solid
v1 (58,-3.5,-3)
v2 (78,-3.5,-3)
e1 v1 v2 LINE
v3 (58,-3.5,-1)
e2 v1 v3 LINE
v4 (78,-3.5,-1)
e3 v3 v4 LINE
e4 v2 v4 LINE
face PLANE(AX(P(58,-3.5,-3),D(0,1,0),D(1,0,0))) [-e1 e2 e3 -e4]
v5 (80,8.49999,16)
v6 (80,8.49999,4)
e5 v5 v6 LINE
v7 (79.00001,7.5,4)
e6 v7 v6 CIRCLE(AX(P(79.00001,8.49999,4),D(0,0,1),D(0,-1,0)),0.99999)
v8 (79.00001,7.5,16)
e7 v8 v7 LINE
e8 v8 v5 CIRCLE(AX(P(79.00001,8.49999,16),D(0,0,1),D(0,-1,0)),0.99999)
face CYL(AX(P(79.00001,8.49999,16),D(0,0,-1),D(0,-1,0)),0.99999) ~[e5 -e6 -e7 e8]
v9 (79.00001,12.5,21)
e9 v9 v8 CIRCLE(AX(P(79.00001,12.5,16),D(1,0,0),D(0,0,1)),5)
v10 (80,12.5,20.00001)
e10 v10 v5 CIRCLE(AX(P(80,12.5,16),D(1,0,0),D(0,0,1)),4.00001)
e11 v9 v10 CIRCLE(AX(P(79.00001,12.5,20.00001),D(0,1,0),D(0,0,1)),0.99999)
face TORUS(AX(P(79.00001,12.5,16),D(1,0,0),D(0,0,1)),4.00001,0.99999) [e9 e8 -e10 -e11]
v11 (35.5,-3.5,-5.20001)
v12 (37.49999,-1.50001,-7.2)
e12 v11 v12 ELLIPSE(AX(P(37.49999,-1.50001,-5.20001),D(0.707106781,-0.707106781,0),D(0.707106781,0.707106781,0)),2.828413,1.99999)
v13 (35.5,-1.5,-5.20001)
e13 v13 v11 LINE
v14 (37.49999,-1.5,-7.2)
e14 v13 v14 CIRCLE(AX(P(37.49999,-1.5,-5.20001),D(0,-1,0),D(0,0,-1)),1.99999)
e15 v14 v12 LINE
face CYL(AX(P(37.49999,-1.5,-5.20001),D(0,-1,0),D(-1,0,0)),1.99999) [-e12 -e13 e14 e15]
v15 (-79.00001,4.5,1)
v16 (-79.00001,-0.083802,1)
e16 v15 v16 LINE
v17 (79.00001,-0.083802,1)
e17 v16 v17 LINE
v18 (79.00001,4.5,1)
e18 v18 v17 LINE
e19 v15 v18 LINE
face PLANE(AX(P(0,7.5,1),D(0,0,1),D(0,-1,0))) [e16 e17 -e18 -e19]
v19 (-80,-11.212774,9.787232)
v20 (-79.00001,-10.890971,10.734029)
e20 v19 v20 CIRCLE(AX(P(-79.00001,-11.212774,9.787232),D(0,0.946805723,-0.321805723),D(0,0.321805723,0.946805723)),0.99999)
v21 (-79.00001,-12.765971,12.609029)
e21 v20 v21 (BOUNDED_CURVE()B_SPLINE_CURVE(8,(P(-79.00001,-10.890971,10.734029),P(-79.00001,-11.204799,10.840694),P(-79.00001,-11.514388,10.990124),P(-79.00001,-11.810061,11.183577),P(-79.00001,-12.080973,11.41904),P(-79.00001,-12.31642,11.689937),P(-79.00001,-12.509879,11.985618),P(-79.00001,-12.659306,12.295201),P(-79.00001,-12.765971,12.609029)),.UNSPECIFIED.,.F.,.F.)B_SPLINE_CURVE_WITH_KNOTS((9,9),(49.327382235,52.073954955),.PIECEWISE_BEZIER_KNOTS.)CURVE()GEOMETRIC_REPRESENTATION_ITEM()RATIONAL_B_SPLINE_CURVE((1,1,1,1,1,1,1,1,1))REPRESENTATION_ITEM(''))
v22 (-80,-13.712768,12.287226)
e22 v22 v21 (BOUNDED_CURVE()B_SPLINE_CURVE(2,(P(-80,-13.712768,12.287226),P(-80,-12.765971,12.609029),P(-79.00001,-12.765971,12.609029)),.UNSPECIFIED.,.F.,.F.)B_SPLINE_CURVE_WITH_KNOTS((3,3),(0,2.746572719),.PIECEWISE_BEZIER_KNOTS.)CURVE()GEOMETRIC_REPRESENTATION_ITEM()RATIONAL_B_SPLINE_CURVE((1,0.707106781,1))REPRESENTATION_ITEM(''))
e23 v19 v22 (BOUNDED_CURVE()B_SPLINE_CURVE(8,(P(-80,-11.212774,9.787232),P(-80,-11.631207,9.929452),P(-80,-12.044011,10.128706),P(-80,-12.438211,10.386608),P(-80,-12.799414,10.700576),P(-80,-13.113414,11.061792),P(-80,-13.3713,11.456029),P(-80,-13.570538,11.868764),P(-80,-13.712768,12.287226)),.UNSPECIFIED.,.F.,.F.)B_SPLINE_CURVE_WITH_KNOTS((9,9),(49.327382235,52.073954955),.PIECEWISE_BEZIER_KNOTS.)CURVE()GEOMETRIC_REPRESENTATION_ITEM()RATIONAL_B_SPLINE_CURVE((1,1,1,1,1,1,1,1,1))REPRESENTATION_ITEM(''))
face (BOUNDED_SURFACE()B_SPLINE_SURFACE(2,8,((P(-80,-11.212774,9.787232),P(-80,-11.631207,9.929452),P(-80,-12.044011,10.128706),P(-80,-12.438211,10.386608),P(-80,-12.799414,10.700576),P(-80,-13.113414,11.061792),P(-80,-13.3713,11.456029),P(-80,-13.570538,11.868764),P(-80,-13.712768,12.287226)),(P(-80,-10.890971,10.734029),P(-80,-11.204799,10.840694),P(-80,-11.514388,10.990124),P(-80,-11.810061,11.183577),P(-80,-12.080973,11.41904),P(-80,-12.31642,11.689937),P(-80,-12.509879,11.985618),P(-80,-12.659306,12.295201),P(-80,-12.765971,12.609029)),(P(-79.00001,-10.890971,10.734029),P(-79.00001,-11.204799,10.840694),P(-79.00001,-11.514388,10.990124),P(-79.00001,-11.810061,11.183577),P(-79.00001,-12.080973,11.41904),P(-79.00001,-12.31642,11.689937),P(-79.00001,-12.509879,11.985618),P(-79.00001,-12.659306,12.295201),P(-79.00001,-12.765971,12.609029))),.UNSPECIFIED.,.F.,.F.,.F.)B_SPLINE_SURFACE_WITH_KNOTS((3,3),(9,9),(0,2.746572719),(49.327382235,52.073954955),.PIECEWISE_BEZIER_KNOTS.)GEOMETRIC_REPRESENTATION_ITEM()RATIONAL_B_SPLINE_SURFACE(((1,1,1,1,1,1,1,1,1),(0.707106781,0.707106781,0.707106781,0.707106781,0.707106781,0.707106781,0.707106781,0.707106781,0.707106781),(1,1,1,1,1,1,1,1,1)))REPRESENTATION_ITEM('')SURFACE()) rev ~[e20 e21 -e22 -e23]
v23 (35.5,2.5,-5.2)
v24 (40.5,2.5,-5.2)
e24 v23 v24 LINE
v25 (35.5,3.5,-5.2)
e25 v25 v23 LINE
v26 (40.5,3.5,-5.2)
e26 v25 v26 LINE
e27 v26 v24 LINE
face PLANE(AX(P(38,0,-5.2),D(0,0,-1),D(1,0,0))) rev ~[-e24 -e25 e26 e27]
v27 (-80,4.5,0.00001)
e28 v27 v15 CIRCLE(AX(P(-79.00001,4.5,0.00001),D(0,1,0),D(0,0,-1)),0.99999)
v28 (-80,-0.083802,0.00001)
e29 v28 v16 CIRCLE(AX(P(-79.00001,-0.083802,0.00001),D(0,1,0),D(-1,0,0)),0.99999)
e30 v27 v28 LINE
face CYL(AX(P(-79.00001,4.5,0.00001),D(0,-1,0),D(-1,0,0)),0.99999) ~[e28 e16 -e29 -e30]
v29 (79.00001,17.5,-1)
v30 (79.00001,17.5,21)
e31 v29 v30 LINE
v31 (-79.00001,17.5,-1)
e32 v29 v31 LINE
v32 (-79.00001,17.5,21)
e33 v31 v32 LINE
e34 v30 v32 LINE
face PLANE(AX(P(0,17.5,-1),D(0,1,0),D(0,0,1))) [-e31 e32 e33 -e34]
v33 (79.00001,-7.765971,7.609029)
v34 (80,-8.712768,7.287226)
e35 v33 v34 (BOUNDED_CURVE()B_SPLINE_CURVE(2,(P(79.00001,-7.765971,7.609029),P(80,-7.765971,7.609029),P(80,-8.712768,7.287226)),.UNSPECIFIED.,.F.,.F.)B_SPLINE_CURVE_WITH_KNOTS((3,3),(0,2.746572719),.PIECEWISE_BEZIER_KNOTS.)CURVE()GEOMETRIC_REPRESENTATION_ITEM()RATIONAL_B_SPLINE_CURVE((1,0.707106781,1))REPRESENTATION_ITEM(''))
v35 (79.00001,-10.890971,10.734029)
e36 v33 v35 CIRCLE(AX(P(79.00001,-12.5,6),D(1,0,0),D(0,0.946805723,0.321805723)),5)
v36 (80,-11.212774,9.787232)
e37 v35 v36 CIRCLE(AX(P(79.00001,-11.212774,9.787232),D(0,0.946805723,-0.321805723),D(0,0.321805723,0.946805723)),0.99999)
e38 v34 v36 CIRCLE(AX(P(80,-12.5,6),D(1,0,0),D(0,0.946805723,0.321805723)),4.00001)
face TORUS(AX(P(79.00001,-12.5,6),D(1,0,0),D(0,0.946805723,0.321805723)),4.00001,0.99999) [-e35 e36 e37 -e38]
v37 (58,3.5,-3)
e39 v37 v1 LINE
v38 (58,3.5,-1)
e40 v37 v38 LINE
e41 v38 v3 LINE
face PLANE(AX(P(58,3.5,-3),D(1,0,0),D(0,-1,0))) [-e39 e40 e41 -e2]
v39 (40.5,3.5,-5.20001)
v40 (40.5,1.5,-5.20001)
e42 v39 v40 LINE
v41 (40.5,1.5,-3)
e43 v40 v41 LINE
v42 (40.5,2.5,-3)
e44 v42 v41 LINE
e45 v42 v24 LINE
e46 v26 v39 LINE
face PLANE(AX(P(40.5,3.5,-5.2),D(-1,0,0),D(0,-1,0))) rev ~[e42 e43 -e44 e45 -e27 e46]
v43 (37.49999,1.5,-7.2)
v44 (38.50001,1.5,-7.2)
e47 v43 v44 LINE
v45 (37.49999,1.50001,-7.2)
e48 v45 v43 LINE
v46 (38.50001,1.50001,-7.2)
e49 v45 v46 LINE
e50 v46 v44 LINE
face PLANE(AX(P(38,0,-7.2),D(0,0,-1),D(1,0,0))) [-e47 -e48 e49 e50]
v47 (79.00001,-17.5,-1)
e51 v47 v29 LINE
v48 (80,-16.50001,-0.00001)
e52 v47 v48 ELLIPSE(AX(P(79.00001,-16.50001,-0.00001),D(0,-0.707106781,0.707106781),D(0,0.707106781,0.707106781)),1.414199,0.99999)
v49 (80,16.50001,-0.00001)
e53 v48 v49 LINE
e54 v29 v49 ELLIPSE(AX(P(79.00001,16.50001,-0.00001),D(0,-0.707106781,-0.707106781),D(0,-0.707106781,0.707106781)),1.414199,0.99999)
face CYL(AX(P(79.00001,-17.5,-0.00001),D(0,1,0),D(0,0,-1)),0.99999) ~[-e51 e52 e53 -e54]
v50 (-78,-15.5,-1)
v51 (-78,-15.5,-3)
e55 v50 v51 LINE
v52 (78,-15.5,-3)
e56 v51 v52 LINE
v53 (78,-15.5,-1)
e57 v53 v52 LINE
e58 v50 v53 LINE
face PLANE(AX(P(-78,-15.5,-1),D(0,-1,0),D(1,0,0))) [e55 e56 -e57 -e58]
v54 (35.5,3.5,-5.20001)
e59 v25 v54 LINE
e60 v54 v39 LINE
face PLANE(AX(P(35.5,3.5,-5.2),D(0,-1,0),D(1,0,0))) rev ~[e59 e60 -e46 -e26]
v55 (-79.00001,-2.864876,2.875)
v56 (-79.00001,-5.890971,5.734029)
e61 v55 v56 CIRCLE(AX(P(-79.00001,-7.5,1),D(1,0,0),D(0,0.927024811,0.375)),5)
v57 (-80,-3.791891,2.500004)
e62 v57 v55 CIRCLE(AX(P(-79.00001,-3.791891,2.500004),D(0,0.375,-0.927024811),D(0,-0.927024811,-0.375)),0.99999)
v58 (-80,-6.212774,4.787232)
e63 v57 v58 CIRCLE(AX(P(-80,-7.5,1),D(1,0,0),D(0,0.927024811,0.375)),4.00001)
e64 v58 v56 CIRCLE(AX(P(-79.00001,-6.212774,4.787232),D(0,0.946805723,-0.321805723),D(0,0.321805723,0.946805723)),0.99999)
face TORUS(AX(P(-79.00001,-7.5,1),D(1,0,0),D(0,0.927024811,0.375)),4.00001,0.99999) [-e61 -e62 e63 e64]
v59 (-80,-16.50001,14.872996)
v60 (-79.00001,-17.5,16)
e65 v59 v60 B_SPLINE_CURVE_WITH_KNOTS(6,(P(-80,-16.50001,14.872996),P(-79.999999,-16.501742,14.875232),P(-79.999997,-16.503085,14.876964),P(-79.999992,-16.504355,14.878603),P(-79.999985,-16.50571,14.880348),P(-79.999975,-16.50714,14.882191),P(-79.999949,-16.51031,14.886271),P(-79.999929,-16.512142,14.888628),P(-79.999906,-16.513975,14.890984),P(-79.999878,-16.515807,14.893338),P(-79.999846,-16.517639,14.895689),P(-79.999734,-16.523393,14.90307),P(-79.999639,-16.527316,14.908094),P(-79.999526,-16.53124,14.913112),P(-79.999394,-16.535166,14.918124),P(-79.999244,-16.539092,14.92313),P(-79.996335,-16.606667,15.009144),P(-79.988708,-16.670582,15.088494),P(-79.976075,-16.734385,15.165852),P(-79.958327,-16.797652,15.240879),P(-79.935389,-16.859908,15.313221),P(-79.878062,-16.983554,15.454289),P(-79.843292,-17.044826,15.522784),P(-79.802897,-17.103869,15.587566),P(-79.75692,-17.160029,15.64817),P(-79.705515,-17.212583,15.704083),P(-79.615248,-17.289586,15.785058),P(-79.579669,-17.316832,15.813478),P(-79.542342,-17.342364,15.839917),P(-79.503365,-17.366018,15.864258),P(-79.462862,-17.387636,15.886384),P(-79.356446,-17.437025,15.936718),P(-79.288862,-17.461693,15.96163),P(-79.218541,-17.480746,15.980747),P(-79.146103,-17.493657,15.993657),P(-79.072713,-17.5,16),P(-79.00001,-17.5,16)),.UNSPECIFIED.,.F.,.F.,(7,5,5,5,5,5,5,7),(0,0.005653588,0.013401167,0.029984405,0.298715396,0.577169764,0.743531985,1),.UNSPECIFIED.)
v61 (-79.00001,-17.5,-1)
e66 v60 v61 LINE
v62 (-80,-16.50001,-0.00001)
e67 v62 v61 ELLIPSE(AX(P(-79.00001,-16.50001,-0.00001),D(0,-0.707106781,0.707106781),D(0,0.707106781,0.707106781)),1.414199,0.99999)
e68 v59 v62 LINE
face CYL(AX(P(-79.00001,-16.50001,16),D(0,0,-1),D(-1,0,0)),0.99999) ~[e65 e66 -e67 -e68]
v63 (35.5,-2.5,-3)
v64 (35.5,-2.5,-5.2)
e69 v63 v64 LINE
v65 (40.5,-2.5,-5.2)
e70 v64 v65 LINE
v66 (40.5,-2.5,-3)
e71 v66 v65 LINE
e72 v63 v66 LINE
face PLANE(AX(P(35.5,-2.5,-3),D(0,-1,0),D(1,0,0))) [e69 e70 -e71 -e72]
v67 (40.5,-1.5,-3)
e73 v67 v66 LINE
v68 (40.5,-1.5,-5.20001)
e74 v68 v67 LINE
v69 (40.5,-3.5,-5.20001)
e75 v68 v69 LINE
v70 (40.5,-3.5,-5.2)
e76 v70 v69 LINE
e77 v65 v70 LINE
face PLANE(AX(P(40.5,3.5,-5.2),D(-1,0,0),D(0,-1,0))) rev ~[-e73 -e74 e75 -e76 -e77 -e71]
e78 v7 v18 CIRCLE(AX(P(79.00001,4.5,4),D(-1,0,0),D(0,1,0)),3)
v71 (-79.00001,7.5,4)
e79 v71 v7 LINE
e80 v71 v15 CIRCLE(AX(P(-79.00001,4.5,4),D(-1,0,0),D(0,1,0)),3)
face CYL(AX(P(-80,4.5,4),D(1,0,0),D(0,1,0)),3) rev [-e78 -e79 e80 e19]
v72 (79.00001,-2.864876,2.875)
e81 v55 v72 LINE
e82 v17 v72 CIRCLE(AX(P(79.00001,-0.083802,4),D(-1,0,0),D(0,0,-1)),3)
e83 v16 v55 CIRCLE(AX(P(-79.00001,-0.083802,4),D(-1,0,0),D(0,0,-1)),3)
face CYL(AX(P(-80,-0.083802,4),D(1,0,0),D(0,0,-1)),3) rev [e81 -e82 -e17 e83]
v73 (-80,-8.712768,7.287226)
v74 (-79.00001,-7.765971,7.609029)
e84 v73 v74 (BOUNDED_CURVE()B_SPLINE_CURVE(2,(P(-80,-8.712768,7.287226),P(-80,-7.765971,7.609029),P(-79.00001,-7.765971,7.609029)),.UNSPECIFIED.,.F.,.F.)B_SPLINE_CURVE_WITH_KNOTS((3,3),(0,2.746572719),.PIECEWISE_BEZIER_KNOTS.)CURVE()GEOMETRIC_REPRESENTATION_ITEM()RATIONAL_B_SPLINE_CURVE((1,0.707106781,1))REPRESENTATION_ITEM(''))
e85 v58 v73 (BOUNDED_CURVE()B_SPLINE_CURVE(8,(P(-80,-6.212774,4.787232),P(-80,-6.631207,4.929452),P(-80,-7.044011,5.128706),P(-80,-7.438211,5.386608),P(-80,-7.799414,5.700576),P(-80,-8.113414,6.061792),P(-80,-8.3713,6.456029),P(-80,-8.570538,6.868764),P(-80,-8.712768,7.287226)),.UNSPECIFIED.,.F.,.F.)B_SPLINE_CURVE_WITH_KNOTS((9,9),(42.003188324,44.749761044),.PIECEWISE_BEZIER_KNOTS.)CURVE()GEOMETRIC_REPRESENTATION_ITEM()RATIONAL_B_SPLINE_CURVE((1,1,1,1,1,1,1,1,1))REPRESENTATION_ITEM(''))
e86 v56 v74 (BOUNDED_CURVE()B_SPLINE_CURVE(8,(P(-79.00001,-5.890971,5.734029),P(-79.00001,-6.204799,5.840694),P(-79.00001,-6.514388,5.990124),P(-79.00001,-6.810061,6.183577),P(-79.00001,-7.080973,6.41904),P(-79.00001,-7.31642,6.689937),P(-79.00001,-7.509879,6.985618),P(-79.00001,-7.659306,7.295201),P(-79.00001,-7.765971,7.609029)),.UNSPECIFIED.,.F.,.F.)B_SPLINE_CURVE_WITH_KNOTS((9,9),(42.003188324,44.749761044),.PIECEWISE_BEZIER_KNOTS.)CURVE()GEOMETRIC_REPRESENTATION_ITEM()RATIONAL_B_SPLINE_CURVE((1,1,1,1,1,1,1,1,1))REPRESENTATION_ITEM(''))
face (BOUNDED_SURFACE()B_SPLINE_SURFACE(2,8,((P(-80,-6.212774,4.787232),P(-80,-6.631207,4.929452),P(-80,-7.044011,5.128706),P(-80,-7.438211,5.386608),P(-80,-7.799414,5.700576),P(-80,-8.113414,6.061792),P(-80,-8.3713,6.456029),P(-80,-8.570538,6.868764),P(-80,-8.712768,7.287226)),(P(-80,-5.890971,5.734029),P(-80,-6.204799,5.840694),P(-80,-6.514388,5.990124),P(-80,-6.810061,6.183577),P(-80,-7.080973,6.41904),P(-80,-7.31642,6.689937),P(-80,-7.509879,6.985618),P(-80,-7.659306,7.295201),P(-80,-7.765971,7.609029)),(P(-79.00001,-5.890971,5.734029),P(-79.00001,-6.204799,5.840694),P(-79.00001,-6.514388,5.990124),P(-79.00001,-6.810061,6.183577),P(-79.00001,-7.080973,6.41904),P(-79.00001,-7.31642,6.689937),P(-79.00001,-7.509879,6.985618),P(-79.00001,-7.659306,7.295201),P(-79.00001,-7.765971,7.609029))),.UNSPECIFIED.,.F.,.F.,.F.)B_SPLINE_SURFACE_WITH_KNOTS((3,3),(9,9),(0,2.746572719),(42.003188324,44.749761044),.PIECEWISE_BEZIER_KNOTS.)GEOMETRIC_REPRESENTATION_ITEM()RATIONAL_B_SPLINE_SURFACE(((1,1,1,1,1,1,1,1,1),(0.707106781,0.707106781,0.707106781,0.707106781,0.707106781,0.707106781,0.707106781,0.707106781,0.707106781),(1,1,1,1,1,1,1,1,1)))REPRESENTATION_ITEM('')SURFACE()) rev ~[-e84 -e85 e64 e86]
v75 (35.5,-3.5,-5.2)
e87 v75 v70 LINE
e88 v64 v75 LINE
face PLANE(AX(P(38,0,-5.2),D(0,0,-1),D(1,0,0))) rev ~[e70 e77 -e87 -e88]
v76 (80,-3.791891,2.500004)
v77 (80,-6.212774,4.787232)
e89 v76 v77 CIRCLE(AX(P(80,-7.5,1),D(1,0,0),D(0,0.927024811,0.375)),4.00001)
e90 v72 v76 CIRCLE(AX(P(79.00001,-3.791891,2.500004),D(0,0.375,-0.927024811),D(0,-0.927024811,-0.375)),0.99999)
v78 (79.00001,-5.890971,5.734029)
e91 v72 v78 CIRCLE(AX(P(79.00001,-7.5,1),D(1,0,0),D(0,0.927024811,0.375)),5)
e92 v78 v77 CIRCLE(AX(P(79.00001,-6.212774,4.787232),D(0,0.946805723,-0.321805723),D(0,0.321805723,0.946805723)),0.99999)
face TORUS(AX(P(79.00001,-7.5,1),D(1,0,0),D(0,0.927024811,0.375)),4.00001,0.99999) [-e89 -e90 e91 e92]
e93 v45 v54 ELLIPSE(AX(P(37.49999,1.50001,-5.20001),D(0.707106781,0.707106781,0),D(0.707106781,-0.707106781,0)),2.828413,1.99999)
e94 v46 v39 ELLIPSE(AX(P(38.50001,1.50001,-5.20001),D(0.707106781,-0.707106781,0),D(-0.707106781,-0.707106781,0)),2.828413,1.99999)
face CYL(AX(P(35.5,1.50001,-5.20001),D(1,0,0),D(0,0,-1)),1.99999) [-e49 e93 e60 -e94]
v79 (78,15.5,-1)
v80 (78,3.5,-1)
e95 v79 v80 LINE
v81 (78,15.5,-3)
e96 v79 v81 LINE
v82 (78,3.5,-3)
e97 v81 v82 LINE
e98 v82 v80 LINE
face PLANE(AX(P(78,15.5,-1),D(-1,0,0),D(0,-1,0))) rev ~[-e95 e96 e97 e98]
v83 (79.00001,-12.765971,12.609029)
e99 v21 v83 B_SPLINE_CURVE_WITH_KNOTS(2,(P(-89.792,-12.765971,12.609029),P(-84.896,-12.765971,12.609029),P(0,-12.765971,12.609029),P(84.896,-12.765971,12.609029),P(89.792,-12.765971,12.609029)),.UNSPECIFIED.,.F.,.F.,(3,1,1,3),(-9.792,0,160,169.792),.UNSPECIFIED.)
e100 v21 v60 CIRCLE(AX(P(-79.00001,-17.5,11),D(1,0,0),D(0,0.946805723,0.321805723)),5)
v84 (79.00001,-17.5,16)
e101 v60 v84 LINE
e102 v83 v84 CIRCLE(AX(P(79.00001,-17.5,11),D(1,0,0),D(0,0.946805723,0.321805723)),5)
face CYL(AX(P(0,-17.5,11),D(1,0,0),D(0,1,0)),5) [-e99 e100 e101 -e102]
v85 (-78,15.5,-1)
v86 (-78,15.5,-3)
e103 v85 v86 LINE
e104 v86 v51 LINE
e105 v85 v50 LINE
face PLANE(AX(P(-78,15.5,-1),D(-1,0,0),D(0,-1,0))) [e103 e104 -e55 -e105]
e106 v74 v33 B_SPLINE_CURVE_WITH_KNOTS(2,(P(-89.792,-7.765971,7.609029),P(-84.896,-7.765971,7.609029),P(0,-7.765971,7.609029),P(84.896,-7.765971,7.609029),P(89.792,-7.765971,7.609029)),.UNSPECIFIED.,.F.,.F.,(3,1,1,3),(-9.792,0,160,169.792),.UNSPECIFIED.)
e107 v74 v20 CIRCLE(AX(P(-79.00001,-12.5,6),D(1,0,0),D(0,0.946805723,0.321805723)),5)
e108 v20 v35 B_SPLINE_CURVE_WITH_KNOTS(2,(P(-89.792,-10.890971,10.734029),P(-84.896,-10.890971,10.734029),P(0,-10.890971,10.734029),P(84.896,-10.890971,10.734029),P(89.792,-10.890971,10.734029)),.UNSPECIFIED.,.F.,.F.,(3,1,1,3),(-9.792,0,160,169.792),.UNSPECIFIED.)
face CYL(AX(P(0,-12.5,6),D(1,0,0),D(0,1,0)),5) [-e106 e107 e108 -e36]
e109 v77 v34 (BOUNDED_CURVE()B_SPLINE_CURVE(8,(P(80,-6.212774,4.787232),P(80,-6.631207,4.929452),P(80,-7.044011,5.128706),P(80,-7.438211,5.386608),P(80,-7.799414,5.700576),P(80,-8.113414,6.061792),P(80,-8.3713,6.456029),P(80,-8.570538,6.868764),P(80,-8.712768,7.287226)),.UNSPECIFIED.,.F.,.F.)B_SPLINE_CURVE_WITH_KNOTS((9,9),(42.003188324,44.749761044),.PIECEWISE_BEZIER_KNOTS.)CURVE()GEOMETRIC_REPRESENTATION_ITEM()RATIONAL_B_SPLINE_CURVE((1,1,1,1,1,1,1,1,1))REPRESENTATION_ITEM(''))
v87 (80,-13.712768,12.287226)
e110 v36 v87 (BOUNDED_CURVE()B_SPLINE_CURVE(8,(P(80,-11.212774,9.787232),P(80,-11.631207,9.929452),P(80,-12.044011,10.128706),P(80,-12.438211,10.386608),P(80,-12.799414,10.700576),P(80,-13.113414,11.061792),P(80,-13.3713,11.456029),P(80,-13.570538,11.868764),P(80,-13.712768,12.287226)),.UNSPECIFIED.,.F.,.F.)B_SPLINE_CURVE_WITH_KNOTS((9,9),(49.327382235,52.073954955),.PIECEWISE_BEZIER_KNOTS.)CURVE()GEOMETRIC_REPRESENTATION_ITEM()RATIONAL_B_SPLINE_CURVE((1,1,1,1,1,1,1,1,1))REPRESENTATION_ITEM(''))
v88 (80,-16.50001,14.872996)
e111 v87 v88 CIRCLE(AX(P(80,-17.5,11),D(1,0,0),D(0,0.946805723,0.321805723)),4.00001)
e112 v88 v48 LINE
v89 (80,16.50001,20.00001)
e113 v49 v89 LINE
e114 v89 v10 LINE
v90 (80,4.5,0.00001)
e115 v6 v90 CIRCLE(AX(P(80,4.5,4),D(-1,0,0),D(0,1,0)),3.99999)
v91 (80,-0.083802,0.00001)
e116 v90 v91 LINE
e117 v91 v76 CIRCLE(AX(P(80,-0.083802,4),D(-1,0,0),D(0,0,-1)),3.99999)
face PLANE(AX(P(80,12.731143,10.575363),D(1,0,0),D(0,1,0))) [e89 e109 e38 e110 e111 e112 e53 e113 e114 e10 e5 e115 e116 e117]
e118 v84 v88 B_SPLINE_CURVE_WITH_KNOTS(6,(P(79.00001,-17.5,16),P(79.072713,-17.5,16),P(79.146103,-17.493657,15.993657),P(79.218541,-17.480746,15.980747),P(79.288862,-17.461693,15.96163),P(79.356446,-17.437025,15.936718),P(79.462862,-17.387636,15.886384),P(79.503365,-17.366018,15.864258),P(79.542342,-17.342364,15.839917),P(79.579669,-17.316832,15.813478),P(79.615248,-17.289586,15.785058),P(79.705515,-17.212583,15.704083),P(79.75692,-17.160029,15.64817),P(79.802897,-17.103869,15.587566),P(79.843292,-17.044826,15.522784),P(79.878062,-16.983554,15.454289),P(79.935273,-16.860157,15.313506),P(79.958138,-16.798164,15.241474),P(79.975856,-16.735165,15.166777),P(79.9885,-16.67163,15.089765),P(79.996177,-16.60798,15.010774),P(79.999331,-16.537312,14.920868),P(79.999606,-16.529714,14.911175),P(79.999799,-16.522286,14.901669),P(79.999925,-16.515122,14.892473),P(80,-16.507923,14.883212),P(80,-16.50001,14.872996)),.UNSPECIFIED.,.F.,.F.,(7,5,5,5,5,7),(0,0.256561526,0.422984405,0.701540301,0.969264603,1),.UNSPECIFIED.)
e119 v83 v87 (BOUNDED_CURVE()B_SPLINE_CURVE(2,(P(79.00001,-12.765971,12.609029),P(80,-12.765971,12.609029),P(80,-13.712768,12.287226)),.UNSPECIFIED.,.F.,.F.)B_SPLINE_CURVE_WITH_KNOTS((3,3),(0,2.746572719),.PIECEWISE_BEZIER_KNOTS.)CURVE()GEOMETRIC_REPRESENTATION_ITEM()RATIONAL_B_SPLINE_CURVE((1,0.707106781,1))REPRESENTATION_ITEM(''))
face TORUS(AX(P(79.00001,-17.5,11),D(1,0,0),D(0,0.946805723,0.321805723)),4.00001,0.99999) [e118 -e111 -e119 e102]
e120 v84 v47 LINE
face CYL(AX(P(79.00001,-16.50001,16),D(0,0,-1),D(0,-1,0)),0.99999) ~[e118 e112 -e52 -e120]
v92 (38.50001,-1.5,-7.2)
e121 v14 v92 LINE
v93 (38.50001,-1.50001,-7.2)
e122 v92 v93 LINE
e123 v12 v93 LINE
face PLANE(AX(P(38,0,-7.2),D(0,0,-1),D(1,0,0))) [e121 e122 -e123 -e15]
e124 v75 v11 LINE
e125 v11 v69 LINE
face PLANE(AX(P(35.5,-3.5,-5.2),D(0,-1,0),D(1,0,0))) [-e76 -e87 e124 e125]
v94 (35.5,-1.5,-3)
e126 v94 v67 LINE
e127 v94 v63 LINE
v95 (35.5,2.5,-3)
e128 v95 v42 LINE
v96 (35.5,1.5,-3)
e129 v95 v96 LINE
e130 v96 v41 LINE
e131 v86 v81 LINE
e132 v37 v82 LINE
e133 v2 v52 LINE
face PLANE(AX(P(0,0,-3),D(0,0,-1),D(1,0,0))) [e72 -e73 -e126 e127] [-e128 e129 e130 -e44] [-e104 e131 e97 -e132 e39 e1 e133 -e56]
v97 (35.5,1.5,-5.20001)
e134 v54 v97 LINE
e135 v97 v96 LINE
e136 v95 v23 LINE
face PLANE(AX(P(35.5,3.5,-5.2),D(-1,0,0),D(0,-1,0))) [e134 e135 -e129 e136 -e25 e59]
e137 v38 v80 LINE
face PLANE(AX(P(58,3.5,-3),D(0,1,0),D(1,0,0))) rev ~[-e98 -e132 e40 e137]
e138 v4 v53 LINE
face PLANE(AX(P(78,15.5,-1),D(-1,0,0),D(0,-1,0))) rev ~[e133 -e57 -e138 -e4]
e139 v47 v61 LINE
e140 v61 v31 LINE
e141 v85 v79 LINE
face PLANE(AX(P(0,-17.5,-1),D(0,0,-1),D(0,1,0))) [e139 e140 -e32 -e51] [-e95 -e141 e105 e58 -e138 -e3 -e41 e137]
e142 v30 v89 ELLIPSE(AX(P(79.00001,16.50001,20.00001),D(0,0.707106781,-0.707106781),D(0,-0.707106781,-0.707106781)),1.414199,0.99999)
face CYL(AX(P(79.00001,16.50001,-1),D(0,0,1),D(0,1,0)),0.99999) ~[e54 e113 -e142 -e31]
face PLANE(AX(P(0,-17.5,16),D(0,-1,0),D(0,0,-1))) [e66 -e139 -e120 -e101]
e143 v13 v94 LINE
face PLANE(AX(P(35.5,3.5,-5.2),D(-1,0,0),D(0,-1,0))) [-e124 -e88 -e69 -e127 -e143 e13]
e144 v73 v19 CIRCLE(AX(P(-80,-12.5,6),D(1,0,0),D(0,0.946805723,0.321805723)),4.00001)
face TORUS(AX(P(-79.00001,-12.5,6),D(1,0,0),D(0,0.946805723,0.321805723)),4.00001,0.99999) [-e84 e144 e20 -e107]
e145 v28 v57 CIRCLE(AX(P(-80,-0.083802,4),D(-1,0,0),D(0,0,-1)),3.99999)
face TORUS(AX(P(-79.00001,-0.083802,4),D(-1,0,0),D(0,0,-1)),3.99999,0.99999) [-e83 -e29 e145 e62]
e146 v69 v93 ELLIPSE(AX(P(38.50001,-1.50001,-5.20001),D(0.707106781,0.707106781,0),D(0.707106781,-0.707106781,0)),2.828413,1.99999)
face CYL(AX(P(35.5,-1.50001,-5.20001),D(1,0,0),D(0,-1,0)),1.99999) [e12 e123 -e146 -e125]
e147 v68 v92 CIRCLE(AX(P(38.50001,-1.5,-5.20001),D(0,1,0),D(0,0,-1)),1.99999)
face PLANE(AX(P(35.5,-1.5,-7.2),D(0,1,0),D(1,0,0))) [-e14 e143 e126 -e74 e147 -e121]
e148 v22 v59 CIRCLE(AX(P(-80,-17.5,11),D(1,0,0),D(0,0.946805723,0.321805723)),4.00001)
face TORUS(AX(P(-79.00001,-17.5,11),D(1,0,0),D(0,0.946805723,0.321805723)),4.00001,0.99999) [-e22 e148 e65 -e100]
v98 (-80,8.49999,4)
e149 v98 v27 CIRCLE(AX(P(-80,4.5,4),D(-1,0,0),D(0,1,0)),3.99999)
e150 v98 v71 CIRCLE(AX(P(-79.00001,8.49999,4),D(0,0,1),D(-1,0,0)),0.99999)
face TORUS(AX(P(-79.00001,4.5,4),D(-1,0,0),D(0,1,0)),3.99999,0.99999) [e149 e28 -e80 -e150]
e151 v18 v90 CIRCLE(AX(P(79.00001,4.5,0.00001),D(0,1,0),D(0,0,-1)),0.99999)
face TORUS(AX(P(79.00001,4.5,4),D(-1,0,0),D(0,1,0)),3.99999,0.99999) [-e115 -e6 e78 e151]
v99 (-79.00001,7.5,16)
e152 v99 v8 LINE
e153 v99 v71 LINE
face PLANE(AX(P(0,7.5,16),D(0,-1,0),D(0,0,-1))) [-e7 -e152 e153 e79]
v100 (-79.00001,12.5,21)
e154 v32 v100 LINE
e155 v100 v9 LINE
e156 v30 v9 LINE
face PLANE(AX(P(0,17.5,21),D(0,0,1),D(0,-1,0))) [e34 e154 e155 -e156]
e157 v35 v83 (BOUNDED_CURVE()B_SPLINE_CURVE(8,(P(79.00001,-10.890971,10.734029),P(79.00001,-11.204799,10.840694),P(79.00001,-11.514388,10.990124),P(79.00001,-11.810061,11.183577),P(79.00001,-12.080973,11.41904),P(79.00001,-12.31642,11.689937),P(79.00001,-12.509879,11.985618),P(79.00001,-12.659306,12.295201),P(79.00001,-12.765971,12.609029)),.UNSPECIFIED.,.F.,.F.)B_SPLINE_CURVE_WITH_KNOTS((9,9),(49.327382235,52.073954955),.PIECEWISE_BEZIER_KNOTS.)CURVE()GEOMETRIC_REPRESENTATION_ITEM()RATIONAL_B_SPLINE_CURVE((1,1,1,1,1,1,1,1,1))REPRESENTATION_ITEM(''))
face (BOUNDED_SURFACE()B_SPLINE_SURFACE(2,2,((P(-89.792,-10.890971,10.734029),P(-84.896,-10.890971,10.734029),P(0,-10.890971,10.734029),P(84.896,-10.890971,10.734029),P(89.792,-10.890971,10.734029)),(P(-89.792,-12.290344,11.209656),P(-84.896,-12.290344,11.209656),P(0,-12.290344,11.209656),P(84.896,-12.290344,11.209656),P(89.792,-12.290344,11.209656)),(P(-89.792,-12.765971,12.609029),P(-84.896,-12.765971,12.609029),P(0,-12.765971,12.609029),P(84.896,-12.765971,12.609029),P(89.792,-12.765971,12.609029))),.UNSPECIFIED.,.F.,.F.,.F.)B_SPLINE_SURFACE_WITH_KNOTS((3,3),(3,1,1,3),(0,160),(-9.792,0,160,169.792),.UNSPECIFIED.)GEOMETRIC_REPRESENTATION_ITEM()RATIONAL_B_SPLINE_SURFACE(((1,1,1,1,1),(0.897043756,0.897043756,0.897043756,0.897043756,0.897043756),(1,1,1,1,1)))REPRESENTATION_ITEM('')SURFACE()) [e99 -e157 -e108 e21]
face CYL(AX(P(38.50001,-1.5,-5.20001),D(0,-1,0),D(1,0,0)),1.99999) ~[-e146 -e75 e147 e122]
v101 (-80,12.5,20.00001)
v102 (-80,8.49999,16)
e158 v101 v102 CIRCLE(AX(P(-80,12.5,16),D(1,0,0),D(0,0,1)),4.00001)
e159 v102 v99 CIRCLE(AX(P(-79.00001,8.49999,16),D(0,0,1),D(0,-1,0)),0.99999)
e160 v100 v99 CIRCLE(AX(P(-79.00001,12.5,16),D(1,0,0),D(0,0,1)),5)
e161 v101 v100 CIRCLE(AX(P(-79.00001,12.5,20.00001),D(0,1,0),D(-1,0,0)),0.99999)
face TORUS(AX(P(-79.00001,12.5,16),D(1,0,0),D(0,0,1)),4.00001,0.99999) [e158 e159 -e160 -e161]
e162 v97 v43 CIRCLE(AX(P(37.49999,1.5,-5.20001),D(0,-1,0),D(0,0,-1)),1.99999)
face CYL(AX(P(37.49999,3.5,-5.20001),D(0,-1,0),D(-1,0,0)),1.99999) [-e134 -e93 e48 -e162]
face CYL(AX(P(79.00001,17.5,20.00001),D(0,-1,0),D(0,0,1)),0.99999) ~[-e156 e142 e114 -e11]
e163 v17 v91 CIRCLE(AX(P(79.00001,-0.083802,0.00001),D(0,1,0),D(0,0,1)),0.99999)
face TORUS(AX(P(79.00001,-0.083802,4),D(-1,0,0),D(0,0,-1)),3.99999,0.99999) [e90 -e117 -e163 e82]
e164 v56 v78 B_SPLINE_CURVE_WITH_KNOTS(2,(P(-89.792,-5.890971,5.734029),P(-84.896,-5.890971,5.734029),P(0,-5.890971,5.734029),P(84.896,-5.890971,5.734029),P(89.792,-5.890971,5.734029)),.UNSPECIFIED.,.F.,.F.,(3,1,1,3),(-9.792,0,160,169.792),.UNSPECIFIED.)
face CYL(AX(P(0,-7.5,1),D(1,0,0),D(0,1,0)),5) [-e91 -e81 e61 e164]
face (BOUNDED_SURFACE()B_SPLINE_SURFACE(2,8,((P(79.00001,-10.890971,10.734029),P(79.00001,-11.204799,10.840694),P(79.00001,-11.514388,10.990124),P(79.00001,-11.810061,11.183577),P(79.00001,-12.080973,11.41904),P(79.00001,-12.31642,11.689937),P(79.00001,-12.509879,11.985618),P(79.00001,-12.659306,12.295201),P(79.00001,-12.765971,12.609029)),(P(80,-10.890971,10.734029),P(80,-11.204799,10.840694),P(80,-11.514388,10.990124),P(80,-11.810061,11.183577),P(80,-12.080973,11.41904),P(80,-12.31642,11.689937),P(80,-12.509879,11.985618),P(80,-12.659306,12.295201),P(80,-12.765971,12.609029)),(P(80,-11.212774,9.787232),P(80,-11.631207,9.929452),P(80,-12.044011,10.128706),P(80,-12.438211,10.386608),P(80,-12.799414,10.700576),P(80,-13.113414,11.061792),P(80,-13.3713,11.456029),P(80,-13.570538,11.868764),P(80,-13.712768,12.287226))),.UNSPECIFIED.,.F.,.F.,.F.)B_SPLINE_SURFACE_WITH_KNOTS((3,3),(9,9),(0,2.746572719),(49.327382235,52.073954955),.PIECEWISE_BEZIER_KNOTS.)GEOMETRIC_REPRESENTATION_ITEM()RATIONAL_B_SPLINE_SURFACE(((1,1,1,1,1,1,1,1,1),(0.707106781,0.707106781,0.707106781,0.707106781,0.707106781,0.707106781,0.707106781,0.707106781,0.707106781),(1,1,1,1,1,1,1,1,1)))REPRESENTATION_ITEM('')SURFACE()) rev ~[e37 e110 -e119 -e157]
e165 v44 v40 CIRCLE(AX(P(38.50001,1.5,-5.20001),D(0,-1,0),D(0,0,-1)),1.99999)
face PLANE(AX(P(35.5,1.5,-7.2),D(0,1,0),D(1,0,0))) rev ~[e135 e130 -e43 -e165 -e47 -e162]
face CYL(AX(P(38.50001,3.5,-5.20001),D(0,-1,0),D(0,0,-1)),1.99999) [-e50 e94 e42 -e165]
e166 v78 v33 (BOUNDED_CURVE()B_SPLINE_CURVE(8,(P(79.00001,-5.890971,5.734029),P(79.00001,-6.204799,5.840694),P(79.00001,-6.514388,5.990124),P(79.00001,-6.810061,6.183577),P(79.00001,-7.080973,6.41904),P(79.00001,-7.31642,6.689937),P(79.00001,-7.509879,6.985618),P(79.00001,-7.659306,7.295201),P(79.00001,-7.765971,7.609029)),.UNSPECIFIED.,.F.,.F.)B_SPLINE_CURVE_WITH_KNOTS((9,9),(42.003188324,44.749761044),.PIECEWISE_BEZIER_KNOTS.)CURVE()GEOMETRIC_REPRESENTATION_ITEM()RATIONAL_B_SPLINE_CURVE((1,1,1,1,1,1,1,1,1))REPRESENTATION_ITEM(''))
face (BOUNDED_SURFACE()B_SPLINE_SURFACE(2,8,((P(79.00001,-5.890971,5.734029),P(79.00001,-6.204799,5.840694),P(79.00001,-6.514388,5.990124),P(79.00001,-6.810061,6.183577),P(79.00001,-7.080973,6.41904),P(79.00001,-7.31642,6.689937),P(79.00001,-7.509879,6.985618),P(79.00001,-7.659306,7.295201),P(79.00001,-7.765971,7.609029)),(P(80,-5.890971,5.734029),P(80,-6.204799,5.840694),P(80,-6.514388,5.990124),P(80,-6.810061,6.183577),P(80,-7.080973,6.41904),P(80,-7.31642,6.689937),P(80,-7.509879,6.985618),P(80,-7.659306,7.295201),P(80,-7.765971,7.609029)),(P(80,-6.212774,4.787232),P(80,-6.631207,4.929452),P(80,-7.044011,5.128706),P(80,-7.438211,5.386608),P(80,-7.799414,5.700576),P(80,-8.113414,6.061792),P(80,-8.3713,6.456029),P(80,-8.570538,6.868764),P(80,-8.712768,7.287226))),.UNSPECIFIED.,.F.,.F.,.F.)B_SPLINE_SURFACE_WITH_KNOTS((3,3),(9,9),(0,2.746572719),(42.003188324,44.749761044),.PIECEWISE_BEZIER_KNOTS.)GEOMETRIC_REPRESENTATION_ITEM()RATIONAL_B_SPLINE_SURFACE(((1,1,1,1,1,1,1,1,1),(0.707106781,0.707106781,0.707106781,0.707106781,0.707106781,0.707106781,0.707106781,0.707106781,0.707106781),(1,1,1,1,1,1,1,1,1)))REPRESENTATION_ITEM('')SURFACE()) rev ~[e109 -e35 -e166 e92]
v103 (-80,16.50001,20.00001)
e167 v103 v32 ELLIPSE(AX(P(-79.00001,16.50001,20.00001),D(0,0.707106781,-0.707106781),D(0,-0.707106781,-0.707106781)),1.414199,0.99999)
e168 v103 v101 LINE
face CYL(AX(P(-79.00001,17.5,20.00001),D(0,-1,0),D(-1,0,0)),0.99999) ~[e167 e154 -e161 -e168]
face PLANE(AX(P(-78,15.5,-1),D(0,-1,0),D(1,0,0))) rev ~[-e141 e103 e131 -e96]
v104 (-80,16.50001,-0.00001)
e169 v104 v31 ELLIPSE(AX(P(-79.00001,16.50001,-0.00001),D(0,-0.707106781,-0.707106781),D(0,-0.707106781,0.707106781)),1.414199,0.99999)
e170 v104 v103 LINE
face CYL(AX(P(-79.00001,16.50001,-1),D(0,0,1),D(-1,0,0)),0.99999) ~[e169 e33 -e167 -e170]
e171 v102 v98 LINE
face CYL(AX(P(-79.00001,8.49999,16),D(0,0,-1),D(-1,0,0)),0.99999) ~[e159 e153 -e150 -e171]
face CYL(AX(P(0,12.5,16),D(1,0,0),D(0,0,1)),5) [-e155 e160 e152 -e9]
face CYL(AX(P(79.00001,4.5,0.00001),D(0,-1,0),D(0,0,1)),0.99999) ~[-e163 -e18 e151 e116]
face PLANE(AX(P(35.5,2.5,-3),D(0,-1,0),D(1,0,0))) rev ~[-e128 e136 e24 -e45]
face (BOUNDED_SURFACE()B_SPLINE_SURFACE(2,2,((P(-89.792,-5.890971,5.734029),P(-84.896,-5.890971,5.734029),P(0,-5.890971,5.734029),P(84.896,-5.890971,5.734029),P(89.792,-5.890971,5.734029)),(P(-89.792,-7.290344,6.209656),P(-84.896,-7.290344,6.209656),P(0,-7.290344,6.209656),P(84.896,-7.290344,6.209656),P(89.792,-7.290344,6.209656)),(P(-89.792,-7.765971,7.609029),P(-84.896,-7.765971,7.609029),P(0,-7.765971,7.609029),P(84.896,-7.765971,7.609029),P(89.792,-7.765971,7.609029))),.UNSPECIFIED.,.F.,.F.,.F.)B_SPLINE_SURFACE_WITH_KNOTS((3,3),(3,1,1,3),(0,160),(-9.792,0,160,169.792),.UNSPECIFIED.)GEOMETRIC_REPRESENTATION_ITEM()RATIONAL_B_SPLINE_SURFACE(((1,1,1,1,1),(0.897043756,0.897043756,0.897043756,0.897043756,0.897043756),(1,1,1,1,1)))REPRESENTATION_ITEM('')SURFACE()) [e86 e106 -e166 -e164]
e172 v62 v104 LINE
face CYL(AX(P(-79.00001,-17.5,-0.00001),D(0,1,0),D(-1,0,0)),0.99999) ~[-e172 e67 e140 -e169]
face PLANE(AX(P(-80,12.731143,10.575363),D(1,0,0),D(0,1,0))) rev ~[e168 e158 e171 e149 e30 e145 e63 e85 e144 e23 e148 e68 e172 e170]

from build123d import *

# Parameters (mm, degrees)
F1_DEPTH  = 80
F2_W      = 156
F2_H      = 31
F3_DEPTH  = 2
F4_W      = 5
F4_H      = 5
F5_DEPTH  = 2.2
F6_W      = 5
F6_H      = 7
F7_DEPTH  = 2
F8_W      = 5
F8_H      = 3
F9_DEPTH  = 4.2
F10_R     = 1.99999
F11_W     = 20
F11_H     = 7
F12_DEPTH = 2
F13_R     = 3
F14_R     = 0.99999


# Not quite as in the source:
# - a fillet or chamfer is up to 0.001 mm smaller than in the source, because OpenCascade refuses the exact size


with BuildPart() as f1:
    # F0 (on Right) → F1 (new body, symmetric)
    with BuildSketch(Plane.YZ):
        with BuildLine():
            Line((7.5, 1), (17.5, 1))
            Line((17.5, 1), (17.5, 21))
            Line((17.5, 21), (12.5, 21))
            ThreePointArc((12.5, 21), (8.9644660941, 19.5355339059), (7.5, 16))
            Line((7.5, 16), (7.5, 1))
        make_face()
        Polygon((17.5, -1), (17.5, 1), (7.5, 1), (-2.5, 1), (-7.5, 1), (-12.5, 1), (-17.5, 1), (-17.5, -1), align=None)
        with BuildLine():
            Line((-17.5, 16), (-17.5, 1))
            Line((-17.5, 1), (-12.5, 1))
            Line((-12.5, 1), (-12.5, 11))
            ThreePointArc((-12.5, 11), (-13.9644660941, 14.5355339059), (-17.5, 16))
        make_face()
        with BuildLine():
            Line((-12.5, 1), (-7.5, 1))
            Line((-7.5, 1), (-7.5, 6))
            ThreePointArc((-7.5, 6), (-8.9644660941, 9.5355339059), (-12.5, 11))
            Line((-12.5, 11), (-12.5, 1))
        make_face()
        with BuildLine():
            Line((-7.5, 1), (-2.5, 1))
            ThreePointArc((-2.5, 1), (-3.9644660941, 4.5355339059), (-7.5, 6))
            Line((-7.5, 6), (-7.5, 1))
        make_face()
    extrude(amount=F1_DEPTH, both=True)

    # F2 (on face) → F3 (join)
    with BuildSketch(Plane(origin=(0, 0, -1), x_dir=(1, 0, 0), z_dir=(0, 0, -1))):
        Rectangle(F2_W, F2_H)
    extrude(amount=F3_DEPTH)

    # F4 (on face) → F5 (join)
    with BuildSketch(Plane(origin=(0, 0, -3), x_dir=(1, 0, 0), z_dir=(0, 0, -1))):
        with Locations((38, 0)):
            Rectangle(F4_W, F4_H)
    extrude(amount=F5_DEPTH)

    # F6 (on face) → F7 (join)
    with BuildSketch(Plane(origin=(0, 0, -5.2), x_dir=(1, 0, 0), z_dir=(0, 0, -1))):
        with Locations((38, 0)):
            Rectangle(F6_W, F6_H)
    extrude(amount=F7_DEPTH)

    # F8 (on face) → F9 (cut)
    with BuildSketch(Plane(origin=(0, 0, -7.2), x_dir=(1, 0, 0), z_dir=(0, 0, -1))):
        with Locations((38, 0)):
            Rectangle(F8_W, F8_H)
    extrude(amount=-F9_DEPTH, mode=Mode.SUBTRACT)

    # F10 (radius 2 in the source; OpenCascade refuses exactly that, so slightly less here)
    f10_edges = [f1.edges().sort_by_distance(p)[0] for p in [
        (40.5, 2.5, -7.2),
        (38, 3.5, -7.2),
        (40.5, -2.5, -7.2),
        (38, -3.5, -7.2),
        (35.5, -2.5, -7.2),
        (35.5, 2.5, -7.2),
    ]]
    fillet(f10_edges, radius=F10_R)

    # F11 (on face) → F12 (cut)
    with BuildSketch(Plane(origin=(0, 0, -3), x_dir=(1, 0, 0), z_dir=(0, 0, -1))):
        with Locations((68, 0)):
            Rectangle(F11_W, F11_H)
    extrude(amount=-F12_DEPTH, mode=Mode.SUBTRACT)

    # F13
    f13_edges = [f1.edges().sort_by_distance(p)[0] for p in [
        (0, -12.5, 11),
        (0, -7.5, 6),
        (0, -2.5, 1),
        (0, 7.5, 1),
    ]]
    fillet(f13_edges, radius=F13_R)

    # F14 (radius 1 in the source; OpenCascade refuses exactly that, so slightly less here)
    f14_edges = [f1.edges().sort_by_distance(p)[0] for p in [
        (80, 7.5, 10),
        (80, 6.62132, 1.87868),
        (80, 8.964466, 19.535534),
        (80, 2.208099, 1),
        (80, 15, 21),
        (80, -1.760852, 1.512531),
        (80, 17.5, 10),
        (80, -4.066216, 4.634436),
        (80, 0, -1),
        (80, -7.046875, 6.453125),
        (80, -17.5, 7.5),
        (80, -8.964466, 9.535534),
        (80, -14.588398, 15.064797),
        (80, -12.046875, 11.453125),
        (-80, 7.5, 10),
        (-80, 6.62132, 1.87868),
        (-80, 8.964466, 19.535534),
        (-80, 2.208099, 1),
        (-80, 15, 21),
        (-80, -1.760852, 1.512531),
        (-80, 17.5, 10),
        (-80, -4.066216, 4.634436),
        (-80, 0, -1),
        (-80, -7.046875, 6.453125),
        (-80, -17.5, 7.5),
        (-80, -8.964466, 9.535534),
        (-80, -14.588398, 15.064797),
        (-80, -12.046875, 11.453125),
    ]]
    fillet(f14_edges, radius=F14_R)


solid = f1.part
